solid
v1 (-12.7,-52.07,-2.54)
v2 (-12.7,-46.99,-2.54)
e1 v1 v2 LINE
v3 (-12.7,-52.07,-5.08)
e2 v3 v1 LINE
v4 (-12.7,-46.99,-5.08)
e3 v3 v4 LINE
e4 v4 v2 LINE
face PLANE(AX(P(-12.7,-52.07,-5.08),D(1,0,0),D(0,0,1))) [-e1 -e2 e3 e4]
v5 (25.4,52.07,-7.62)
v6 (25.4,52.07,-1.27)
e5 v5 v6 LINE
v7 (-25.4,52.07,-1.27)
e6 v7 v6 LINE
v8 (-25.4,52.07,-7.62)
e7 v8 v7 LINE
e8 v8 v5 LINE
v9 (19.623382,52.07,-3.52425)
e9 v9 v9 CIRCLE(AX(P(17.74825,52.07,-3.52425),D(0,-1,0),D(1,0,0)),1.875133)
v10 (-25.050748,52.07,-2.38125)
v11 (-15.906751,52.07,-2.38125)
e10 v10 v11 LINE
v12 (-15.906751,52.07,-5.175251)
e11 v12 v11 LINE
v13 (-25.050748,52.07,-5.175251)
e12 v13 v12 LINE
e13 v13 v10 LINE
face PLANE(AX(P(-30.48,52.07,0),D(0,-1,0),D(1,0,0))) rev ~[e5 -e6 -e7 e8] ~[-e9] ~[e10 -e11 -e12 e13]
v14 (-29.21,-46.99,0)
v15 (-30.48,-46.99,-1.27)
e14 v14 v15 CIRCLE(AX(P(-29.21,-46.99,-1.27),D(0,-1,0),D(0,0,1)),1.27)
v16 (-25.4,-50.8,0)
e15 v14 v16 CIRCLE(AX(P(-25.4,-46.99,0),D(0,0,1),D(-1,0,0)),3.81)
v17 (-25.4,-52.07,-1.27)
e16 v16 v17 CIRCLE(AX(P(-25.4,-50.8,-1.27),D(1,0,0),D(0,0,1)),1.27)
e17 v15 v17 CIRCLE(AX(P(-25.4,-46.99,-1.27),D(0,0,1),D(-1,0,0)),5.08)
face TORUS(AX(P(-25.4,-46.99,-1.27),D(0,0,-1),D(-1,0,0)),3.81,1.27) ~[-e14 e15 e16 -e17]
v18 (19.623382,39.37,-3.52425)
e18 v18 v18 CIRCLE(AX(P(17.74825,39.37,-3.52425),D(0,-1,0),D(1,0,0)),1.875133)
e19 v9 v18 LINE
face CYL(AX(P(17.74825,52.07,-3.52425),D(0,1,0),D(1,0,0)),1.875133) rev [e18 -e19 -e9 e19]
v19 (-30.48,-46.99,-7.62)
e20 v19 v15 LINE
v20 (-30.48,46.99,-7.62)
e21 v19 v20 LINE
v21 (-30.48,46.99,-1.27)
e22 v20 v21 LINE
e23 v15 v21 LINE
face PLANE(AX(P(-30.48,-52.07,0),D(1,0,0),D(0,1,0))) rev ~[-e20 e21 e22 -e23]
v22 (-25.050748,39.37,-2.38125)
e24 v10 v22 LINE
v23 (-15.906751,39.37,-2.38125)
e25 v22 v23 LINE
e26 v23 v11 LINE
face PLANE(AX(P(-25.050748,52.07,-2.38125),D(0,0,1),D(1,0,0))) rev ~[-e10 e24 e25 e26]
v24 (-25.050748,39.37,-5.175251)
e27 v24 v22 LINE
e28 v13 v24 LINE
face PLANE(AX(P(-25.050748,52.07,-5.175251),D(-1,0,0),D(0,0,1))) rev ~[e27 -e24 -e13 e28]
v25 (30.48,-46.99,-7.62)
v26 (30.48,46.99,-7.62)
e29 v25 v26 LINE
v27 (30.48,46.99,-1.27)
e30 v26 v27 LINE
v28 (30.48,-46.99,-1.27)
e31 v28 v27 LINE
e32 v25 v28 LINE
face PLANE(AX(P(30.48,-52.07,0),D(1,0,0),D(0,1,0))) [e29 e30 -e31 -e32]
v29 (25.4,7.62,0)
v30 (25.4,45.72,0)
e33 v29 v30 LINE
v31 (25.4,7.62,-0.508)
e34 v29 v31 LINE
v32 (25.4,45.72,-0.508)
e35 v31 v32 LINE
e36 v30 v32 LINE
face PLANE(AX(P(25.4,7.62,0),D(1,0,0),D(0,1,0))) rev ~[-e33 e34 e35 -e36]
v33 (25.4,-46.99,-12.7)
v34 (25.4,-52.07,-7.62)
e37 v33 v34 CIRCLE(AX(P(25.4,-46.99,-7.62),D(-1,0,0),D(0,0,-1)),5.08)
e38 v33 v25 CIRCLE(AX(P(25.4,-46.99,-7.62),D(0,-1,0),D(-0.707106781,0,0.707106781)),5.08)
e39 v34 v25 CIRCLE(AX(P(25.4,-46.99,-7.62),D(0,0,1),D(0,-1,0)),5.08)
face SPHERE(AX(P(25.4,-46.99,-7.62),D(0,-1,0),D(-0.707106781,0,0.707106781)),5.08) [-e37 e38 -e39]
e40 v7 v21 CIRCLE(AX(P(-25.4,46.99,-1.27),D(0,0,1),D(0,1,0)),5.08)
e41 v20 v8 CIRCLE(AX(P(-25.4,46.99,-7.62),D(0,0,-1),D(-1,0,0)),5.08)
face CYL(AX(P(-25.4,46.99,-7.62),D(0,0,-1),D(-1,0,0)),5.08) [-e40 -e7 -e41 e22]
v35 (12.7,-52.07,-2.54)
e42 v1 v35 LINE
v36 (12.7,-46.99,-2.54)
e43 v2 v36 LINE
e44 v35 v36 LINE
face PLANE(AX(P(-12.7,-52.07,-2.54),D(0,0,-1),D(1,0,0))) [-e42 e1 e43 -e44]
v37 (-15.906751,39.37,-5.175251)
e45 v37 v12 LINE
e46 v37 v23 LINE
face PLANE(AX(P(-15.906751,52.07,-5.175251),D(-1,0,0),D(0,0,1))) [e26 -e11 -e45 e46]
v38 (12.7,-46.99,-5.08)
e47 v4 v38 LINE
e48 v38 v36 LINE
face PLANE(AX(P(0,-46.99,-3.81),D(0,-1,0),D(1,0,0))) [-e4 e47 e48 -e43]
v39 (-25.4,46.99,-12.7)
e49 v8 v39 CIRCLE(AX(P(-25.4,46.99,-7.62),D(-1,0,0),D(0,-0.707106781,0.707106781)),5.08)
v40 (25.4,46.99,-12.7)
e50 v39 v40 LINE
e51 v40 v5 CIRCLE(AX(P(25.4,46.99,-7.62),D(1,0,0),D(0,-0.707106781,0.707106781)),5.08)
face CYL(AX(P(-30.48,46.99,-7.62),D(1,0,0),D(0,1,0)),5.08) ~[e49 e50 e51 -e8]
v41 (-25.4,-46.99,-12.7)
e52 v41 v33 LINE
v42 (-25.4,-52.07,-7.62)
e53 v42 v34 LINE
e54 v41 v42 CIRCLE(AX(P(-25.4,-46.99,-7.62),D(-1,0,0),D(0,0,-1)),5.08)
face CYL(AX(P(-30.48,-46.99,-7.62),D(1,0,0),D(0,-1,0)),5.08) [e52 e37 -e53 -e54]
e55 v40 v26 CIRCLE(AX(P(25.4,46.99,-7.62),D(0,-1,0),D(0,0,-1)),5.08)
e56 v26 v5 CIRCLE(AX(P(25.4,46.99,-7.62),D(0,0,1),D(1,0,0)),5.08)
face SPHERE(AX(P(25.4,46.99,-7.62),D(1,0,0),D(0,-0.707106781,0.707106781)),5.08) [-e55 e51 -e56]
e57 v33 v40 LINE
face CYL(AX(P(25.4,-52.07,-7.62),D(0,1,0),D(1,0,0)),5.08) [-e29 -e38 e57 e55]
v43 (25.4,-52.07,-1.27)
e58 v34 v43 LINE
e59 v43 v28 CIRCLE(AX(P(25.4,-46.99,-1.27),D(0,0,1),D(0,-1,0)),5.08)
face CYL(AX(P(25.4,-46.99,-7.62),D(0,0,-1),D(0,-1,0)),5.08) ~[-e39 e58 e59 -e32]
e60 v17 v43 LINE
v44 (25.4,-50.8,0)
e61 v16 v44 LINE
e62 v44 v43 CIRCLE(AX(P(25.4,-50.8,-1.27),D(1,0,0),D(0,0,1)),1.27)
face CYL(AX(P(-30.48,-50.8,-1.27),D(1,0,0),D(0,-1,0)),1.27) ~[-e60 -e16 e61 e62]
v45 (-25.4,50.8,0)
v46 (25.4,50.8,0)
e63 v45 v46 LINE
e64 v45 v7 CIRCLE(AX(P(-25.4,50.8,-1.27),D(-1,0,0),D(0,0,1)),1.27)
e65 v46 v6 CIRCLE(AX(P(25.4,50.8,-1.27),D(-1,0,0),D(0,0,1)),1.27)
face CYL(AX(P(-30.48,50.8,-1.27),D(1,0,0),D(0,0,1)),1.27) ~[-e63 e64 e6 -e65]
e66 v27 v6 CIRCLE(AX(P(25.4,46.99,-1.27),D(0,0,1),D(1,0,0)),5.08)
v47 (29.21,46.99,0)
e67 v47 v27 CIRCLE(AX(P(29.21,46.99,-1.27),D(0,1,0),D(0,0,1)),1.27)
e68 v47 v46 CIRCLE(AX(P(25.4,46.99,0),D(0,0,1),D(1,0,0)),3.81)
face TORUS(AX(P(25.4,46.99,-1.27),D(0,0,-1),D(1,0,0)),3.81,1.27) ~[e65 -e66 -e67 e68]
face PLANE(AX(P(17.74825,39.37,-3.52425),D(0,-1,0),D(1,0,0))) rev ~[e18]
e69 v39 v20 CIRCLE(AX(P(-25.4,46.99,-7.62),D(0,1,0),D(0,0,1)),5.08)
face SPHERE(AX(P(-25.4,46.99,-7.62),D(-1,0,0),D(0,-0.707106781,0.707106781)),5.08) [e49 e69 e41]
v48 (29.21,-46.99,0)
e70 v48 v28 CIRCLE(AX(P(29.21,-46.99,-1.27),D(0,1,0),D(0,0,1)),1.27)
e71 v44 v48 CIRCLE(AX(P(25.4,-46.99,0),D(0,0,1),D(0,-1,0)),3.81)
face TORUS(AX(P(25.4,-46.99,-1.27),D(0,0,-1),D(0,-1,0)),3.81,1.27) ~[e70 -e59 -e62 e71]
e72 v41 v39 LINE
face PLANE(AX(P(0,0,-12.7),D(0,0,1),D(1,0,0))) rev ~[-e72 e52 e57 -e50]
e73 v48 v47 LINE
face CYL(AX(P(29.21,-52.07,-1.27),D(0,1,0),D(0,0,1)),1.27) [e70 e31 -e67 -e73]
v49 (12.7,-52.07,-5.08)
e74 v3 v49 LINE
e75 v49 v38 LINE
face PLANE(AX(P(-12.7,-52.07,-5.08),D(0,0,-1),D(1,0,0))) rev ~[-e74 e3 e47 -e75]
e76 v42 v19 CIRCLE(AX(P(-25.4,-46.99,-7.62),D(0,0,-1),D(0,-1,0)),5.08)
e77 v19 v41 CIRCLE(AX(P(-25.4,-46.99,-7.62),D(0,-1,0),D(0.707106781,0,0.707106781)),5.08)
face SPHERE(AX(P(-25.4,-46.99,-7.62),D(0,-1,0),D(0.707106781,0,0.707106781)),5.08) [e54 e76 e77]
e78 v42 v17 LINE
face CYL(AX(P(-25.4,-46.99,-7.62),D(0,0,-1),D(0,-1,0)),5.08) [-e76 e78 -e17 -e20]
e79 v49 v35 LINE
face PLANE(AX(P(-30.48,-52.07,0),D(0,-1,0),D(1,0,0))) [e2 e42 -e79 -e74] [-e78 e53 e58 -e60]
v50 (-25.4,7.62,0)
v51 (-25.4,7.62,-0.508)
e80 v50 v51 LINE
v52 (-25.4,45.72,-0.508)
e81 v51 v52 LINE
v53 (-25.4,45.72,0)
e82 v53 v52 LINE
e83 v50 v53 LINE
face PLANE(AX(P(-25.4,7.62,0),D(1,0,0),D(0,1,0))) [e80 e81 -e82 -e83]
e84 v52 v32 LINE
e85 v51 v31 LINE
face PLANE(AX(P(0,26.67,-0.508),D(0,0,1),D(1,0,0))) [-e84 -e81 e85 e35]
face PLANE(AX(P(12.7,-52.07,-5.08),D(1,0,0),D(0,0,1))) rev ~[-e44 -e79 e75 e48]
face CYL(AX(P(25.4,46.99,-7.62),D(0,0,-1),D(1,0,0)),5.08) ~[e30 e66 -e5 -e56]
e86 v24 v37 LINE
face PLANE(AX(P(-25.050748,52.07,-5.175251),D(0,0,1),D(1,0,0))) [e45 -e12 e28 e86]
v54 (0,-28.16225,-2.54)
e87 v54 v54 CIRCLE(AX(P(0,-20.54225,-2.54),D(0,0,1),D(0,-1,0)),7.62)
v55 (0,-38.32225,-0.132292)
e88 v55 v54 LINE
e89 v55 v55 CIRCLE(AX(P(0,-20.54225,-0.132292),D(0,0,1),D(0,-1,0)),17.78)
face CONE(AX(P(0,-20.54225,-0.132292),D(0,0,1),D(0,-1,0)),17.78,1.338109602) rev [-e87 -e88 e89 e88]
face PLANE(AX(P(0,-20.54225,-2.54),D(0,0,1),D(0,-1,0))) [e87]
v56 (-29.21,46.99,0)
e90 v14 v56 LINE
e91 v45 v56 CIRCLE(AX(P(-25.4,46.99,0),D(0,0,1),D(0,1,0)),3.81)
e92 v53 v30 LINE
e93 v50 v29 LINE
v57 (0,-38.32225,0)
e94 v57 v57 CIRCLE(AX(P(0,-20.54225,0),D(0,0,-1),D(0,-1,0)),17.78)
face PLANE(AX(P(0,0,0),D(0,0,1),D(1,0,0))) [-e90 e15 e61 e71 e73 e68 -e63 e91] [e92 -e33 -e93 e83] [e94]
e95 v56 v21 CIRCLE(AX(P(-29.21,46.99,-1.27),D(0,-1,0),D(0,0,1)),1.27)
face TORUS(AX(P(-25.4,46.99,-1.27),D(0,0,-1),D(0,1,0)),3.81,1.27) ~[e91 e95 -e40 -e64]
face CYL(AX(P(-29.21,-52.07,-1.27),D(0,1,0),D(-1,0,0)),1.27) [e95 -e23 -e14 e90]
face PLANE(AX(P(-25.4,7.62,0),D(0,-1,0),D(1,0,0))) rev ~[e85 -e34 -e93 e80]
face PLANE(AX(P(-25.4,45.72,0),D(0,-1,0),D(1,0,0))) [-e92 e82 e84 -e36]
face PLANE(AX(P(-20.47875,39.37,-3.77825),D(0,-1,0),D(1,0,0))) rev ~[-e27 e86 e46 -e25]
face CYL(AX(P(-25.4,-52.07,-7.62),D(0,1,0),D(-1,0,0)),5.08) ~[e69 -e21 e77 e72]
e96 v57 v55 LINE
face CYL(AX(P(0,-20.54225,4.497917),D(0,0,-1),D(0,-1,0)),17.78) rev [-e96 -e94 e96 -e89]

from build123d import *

# Parameters (mm, degrees)
F0_W         = 60.96
F0_H         = 104.14
F0_R         = 17.78
F0_W_2       = 50.8
F0_H_2       = 38.1
F0_R_2       = 7.62
F5_DEPTH     = 12.7
F6_R         = 5.08
F7_R         = 1.27
F8_T1_DEPTH  = 7.62
F8_T4_ANGLE  = 90
F8_S7_W      = 5.08
F8_S7_H      = 5.08
F8_T8_DEPTH  = 5.08
F9_T1_DEPTH  = 7.62
F9_T4_ANGLE  = 90
F9_S7_W      = 5.08
F9_S7_H      = 5.08
F9_T8_DEPTH  = 5.08
F10_T1_DEPTH = 7.62
F10_T4_ANGLE = 90
F10_S7_W     = 5.08
F10_S7_H     = 5.08
F10_T8_DEPTH = 5.08
F11_T1_DEPTH = 7.62
F11_T4_ANGLE = 90
F11_S7_W     = 5.08
F11_S7_H     = 5.08
F11_T8_DEPTH = 5.08
F3_W         = 25.4
F3_H         = 2.54
F12_DEPTH    = 5.08
F4_W         = 9.1439969838
F4_H         = 2.7940007858
F13_DEPTH    = 1.27
F4_R         = 1.8751327249
F14_DEPTH    = 12.7
F17_DEPTH    = 0.508


# Not quite as in the source:
# - a fillet or chamfer that OpenCascade refuses, or shapes differently, is made with other operations: its cross-section is extruded or revolved along the edge and cut away or added


with BuildPart() as f5:
    # F0 (on Top) → F5 (new body)
    with BuildSketch(Plane.XY):
        Rectangle(F0_W, F0_H)
        with Locations((0, -21.59)):
            Circle(F0_R, mode=Mode.SUBTRACT)
        with Locations((0, 26.67)):
            Rectangle(F0_W_2, F0_H_2, mode=Mode.SUBTRACT)
        with Locations((0, 26.67)):
            Rectangle(F0_W_2, F0_H_2)
        with Locations((0, -21.59)):
            Circle(F0_R)
        with Locations((0, -21.59)):
            Circle(F0_R_2, mode=Mode.SUBTRACT)
        with Locations((0, -21.59)):
            Circle(F0_R_2)
    extrude(amount=-F5_DEPTH)

    # F6
    f6_edges = [f5.edges().sort_by_distance(p)[0] for p in [
        (0, -52.07, -12.7),
        (30.48, 0, -12.7),
        (0, 52.07, -12.7),
        (-30.48, 0, -12.7),
    ]]
    fillet(f6_edges, radius=F6_R)

    # F7
    f7_edges = [f5.edges().sort_by_distance(p)[0] for p in [
        (0, -52.07, 0),
        (30.48, 0, 0),
        (0, 52.07, 0),
        (-30.48, 0, 0),
    ]]
    fillet(f7_edges, radius=F7_R)

    # F8: fillet of radius 5.08 on 3 edges, made by hand

    # F8_s2 → F8_t1 (cut)
    with BuildSketch(Plane.XY.offset(-7.62)):
        with BuildLine():
            ThreePointArc((-25.4, -52.07), (-28.9921024484, -50.5821024484), (-30.48, -46.99))
            Line((-30.48, -46.99), (-30.48, -52.07))
            Line((-30.48, -52.07), (-25.4, -52.07))
        make_face()
    extrude(amount=F8_T1_DEPTH, mode=Mode.SUBTRACT)

    # F8_s3 → F8_t4 (revolve, cut)
    with BuildSketch(Plane.XZ.offset(46.99)):
        with BuildLine():
            ThreePointArc((-29.21, 0), (-30.1080256121, -0.3719743879), (-30.48, -1.27))
            Line((-30.48, -1.27), (-30.48, 0))
            Line((-30.48, 0), (-29.21, 0))
        make_face()
    revolve(axis=Axis((-25.4, -46.99, 0), (0, 0, 1)), revolution_arc=F8_T4_ANGLE, mode=Mode.SUBTRACT)


with BuildPart() as f8_tool6:
    # F8_s7 → F8_t8 (new body)
    with BuildSketch(Plane.XZ.offset(46.99)):
        with Locations((-27.94, -10.16)):
            Rectangle(F8_S7_W, F8_S7_H)
    extrude(amount=F8_T8_DEPTH)

    # F8_s9 → F8_t10 (revolve, cut)
    with BuildSketch(Plane(origin=(-25.4, -46.99, -7.62), x_dir=(0.7071067812, 0, 0.7071067812), z_dir=(0.7071067812, 0, -0.7071067812))):
        with BuildLine():
            ThreePointArc((0, -5.08), (5.08, 0), (0, 5.08))
            Line((0, 5.08), (0, -5.08))
        make_face()
    revolve(axis=Axis((-25.4, -46.99, -7.62), (0, -1, 0)), mode=Mode.SUBTRACT)


with BuildPart() as f5_1:
    add(f5.part)

    # F8_t5: cut F8_tool6
    add(f8_tool6.part, mode=Mode.SUBTRACT)

    # F9: fillet of radius 5.08 on 3 edges, made by hand

    # F9_s2 → F9_t1 (cut)
    with BuildSketch(Plane.XY.offset(-7.62)):
        with BuildLine():
            ThreePointArc((25.4, -52.07), (28.9921024484, -50.5821024484), (30.48, -46.99))
            Line((30.48, -46.99), (30.48, -52.07))
            Line((30.48, -52.07), (25.4, -52.07))
        make_face()
    extrude(amount=F9_T1_DEPTH, mode=Mode.SUBTRACT)

    # F9_s3 → F9_t4 (revolve, cut)
    with BuildSketch(Plane.YZ.offset(25.4)):
        with BuildLine():
            ThreePointArc((-50.8, 0), (-51.6980256121, -0.3719743879), (-52.07, -1.27))
            Line((-52.07, -1.27), (-52.07, 0))
            Line((-52.07, 0), (-50.8, 0))
        make_face()
    revolve(axis=Axis((25.4, -46.99, 0), (0, 0, 1)), revolution_arc=F9_T4_ANGLE, mode=Mode.SUBTRACT)


with BuildPart() as f9_tool6:
    # F9_s7 → F9_t8 (new body)
    with BuildSketch(Plane.XZ.offset(46.99)):
        with Locations((27.94, -10.16)):
            Rectangle(F9_S7_W, F9_S7_H)
    extrude(amount=F9_T8_DEPTH)

    # F9_s9 → F9_t10 (revolve, cut)
    with BuildSketch(Plane(origin=(25.4, -46.99, -7.62), x_dir=(-0.7071067812, 0, 0.7071067812), z_dir=(0.7071067812, 0, 0.7071067812))):
        with BuildLine():
            ThreePointArc((0, -5.08), (5.08, 0), (0, 5.08))
            Line((0, 5.08), (0, -5.08))
        make_face()
    revolve(axis=Axis((25.4, -46.99, -7.62), (0, -1, 0)), mode=Mode.SUBTRACT)


with BuildPart() as f5_2:
    add(f5_1.part)

    # F9_t5: cut F9_tool6
    add(f9_tool6.part, mode=Mode.SUBTRACT)

    # F10: fillet of radius 5.08 on 3 edges, made by hand

    # F10_s2 → F10_t1 (cut)
    with BuildSketch(Plane.XY.offset(-7.62)):
        with BuildLine():
            ThreePointArc((30.48, 46.99), (28.9921024484, 50.5821024484), (25.4, 52.07))
            Line((25.4, 52.07), (30.48, 52.07))
            Line((30.48, 52.07), (30.48, 46.99))
        make_face()
    extrude(amount=F10_T1_DEPTH, mode=Mode.SUBTRACT)

    # F10_s3 → F10_t4 (revolve, cut)
    with BuildSketch(Plane.XZ.offset(-46.99)):
        with BuildLine():
            ThreePointArc((29.21, 0), (30.1080256121, -0.3719743879), (30.48, -1.27))
            Line((30.48, -1.27), (30.48, 0))
            Line((30.48, 0), (29.21, 0))
        make_face()
    revolve(axis=Axis((25.4, 46.99, 0), (0, 0, 1)), revolution_arc=F10_T4_ANGLE, mode=Mode.SUBTRACT)


with BuildPart() as f10_tool6:
    # F10_s7 → F10_t8 (new body)
    with BuildSketch(Plane.YZ.offset(25.4)):
        with Locations((49.53, -10.16)):
            Rectangle(F10_S7_W, F10_S7_H)
    extrude(amount=F10_T8_DEPTH)

    # F10_s9 → F10_t10 (revolve, cut)
    with BuildSketch(Plane(origin=(25.4, 46.99, -7.62), x_dir=(0, -0.7071067812, 0.7071067812), z_dir=(0, 0.7071067812, 0.7071067812))):
        with BuildLine():
            ThreePointArc((0, -5.08), (5.08, 0), (0, 5.08))
            Line((0, 5.08), (0, -5.08))
        make_face()
    revolve(axis=Axis((25.4, 46.99, -7.62), (1, 0, 0)), mode=Mode.SUBTRACT)


with BuildPart() as f5_3:
    add(f5_2.part)

    # F10_t5: cut F10_tool6
    add(f10_tool6.part, mode=Mode.SUBTRACT)

    # F11: fillet of radius 5.08 on 3 edges, made by hand

    # F11_s2 → F11_t1 (cut)
    with BuildSketch(Plane.XY.offset(-7.62)):
        with BuildLine():
            ThreePointArc((-30.48, 46.99), (-28.9921024484, 50.5821024484), (-25.4, 52.07))
            Line((-25.4, 52.07), (-30.48, 52.07))
            Line((-30.48, 52.07), (-30.48, 46.99))
        make_face()
    extrude(amount=F11_T1_DEPTH, mode=Mode.SUBTRACT)

    # F11_s3 → F11_t4 (revolve, cut)
    with BuildSketch(Plane.YZ.offset(-25.4)):
        with BuildLine():
            ThreePointArc((50.8, 0), (51.6980256121, -0.3719743879), (52.07, -1.27))
            Line((52.07, -1.27), (52.07, 0))
            Line((52.07, 0), (50.8, 0))
        make_face()
    revolve(axis=Axis((-25.4, 46.99, 0), (0, 0, 1)), revolution_arc=F11_T4_ANGLE, mode=Mode.SUBTRACT)


with BuildPart() as f11_tool6:
    # F11_s7 → F11_t8 (new body)
    with BuildSketch(Plane.YZ.offset(-25.4)):
        with Locations((49.53, -10.16)):
            Rectangle(F11_S7_W, F11_S7_H)
    extrude(amount=-F11_T8_DEPTH)

    # F11_s9 → F11_t10 (revolve, cut)
    with BuildSketch(Plane(origin=(-25.4, 46.99, -7.62), x_dir=(0, -0.7071067812, 0.7071067812), z_dir=(0, -0.7071067812, -0.7071067812))):
        with BuildLine():
            ThreePointArc((0, -5.08), (5.08, 0), (0, 5.08))
            Line((0, 5.08), (0, -5.08))
        make_face()
    revolve(axis=Axis((-25.4, 46.99, -7.62), (-1, 0, 0)), mode=Mode.SUBTRACT)


with BuildPart() as f5_4:
    add(f5_3.part)

    # F11_t5: cut F11_tool6
    add(f11_tool6.part, mode=Mode.SUBTRACT)

    # F3 (on line) → F12 (cut)
    with BuildSketch(Plane.XZ.offset(52.07)):
        with Locations((0, -3.81)):
            Rectangle(F3_W, F3_H)
    extrude(amount=-F12_DEPTH, mode=Mode.SUBTRACT)

    # F4 (on line) → F13 (cut)
    with BuildSketch(Plane.XZ.offset(-52.07)):
        with Locations((-20.4787496477, -3.7782501895)):
            Rectangle(F4_W, F4_H)
    extrude(amount=F13_DEPTH, mode=Mode.SUBTRACT)

    # F4 (on line) → F14 (cut)
    with BuildSketch(Plane.XZ.offset(-52.07)):
        with Locations((17.7482496947, -3.5242501181)):
            Circle(F4_R)
        with Locations((-20.4787496477, -3.7782501895)):
            Rectangle(F4_W, F4_H)
    extrude(amount=F14_DEPTH, mode=Mode.SUBTRACT)

    # F15 (on Right) → F16 (revolve, cut)
    with BuildSketch(Plane.YZ):
        Polygon((-20.5422501868, 5.2387503395), (-38.3222501868, 4.4979169496), (-38.3222501868, -0.1322916101), (-28.1622501868, -2.54), (-20.5422501868, -2.54), align=None)
    revolve(axis=Axis((0, -20.5422501868, 1.3493751698), (0, 0, 1)), mode=Mode.SUBTRACT)

    # F0 (on Top) → F17 (cut)
    with BuildSketch(Plane.XY):
        with Locations((0, 26.67)):
            Rectangle(F0_W_2, F0_H_2)
    extrude(amount=-F17_DEPTH, mode=Mode.SUBTRACT)


solid = f5_4.part
